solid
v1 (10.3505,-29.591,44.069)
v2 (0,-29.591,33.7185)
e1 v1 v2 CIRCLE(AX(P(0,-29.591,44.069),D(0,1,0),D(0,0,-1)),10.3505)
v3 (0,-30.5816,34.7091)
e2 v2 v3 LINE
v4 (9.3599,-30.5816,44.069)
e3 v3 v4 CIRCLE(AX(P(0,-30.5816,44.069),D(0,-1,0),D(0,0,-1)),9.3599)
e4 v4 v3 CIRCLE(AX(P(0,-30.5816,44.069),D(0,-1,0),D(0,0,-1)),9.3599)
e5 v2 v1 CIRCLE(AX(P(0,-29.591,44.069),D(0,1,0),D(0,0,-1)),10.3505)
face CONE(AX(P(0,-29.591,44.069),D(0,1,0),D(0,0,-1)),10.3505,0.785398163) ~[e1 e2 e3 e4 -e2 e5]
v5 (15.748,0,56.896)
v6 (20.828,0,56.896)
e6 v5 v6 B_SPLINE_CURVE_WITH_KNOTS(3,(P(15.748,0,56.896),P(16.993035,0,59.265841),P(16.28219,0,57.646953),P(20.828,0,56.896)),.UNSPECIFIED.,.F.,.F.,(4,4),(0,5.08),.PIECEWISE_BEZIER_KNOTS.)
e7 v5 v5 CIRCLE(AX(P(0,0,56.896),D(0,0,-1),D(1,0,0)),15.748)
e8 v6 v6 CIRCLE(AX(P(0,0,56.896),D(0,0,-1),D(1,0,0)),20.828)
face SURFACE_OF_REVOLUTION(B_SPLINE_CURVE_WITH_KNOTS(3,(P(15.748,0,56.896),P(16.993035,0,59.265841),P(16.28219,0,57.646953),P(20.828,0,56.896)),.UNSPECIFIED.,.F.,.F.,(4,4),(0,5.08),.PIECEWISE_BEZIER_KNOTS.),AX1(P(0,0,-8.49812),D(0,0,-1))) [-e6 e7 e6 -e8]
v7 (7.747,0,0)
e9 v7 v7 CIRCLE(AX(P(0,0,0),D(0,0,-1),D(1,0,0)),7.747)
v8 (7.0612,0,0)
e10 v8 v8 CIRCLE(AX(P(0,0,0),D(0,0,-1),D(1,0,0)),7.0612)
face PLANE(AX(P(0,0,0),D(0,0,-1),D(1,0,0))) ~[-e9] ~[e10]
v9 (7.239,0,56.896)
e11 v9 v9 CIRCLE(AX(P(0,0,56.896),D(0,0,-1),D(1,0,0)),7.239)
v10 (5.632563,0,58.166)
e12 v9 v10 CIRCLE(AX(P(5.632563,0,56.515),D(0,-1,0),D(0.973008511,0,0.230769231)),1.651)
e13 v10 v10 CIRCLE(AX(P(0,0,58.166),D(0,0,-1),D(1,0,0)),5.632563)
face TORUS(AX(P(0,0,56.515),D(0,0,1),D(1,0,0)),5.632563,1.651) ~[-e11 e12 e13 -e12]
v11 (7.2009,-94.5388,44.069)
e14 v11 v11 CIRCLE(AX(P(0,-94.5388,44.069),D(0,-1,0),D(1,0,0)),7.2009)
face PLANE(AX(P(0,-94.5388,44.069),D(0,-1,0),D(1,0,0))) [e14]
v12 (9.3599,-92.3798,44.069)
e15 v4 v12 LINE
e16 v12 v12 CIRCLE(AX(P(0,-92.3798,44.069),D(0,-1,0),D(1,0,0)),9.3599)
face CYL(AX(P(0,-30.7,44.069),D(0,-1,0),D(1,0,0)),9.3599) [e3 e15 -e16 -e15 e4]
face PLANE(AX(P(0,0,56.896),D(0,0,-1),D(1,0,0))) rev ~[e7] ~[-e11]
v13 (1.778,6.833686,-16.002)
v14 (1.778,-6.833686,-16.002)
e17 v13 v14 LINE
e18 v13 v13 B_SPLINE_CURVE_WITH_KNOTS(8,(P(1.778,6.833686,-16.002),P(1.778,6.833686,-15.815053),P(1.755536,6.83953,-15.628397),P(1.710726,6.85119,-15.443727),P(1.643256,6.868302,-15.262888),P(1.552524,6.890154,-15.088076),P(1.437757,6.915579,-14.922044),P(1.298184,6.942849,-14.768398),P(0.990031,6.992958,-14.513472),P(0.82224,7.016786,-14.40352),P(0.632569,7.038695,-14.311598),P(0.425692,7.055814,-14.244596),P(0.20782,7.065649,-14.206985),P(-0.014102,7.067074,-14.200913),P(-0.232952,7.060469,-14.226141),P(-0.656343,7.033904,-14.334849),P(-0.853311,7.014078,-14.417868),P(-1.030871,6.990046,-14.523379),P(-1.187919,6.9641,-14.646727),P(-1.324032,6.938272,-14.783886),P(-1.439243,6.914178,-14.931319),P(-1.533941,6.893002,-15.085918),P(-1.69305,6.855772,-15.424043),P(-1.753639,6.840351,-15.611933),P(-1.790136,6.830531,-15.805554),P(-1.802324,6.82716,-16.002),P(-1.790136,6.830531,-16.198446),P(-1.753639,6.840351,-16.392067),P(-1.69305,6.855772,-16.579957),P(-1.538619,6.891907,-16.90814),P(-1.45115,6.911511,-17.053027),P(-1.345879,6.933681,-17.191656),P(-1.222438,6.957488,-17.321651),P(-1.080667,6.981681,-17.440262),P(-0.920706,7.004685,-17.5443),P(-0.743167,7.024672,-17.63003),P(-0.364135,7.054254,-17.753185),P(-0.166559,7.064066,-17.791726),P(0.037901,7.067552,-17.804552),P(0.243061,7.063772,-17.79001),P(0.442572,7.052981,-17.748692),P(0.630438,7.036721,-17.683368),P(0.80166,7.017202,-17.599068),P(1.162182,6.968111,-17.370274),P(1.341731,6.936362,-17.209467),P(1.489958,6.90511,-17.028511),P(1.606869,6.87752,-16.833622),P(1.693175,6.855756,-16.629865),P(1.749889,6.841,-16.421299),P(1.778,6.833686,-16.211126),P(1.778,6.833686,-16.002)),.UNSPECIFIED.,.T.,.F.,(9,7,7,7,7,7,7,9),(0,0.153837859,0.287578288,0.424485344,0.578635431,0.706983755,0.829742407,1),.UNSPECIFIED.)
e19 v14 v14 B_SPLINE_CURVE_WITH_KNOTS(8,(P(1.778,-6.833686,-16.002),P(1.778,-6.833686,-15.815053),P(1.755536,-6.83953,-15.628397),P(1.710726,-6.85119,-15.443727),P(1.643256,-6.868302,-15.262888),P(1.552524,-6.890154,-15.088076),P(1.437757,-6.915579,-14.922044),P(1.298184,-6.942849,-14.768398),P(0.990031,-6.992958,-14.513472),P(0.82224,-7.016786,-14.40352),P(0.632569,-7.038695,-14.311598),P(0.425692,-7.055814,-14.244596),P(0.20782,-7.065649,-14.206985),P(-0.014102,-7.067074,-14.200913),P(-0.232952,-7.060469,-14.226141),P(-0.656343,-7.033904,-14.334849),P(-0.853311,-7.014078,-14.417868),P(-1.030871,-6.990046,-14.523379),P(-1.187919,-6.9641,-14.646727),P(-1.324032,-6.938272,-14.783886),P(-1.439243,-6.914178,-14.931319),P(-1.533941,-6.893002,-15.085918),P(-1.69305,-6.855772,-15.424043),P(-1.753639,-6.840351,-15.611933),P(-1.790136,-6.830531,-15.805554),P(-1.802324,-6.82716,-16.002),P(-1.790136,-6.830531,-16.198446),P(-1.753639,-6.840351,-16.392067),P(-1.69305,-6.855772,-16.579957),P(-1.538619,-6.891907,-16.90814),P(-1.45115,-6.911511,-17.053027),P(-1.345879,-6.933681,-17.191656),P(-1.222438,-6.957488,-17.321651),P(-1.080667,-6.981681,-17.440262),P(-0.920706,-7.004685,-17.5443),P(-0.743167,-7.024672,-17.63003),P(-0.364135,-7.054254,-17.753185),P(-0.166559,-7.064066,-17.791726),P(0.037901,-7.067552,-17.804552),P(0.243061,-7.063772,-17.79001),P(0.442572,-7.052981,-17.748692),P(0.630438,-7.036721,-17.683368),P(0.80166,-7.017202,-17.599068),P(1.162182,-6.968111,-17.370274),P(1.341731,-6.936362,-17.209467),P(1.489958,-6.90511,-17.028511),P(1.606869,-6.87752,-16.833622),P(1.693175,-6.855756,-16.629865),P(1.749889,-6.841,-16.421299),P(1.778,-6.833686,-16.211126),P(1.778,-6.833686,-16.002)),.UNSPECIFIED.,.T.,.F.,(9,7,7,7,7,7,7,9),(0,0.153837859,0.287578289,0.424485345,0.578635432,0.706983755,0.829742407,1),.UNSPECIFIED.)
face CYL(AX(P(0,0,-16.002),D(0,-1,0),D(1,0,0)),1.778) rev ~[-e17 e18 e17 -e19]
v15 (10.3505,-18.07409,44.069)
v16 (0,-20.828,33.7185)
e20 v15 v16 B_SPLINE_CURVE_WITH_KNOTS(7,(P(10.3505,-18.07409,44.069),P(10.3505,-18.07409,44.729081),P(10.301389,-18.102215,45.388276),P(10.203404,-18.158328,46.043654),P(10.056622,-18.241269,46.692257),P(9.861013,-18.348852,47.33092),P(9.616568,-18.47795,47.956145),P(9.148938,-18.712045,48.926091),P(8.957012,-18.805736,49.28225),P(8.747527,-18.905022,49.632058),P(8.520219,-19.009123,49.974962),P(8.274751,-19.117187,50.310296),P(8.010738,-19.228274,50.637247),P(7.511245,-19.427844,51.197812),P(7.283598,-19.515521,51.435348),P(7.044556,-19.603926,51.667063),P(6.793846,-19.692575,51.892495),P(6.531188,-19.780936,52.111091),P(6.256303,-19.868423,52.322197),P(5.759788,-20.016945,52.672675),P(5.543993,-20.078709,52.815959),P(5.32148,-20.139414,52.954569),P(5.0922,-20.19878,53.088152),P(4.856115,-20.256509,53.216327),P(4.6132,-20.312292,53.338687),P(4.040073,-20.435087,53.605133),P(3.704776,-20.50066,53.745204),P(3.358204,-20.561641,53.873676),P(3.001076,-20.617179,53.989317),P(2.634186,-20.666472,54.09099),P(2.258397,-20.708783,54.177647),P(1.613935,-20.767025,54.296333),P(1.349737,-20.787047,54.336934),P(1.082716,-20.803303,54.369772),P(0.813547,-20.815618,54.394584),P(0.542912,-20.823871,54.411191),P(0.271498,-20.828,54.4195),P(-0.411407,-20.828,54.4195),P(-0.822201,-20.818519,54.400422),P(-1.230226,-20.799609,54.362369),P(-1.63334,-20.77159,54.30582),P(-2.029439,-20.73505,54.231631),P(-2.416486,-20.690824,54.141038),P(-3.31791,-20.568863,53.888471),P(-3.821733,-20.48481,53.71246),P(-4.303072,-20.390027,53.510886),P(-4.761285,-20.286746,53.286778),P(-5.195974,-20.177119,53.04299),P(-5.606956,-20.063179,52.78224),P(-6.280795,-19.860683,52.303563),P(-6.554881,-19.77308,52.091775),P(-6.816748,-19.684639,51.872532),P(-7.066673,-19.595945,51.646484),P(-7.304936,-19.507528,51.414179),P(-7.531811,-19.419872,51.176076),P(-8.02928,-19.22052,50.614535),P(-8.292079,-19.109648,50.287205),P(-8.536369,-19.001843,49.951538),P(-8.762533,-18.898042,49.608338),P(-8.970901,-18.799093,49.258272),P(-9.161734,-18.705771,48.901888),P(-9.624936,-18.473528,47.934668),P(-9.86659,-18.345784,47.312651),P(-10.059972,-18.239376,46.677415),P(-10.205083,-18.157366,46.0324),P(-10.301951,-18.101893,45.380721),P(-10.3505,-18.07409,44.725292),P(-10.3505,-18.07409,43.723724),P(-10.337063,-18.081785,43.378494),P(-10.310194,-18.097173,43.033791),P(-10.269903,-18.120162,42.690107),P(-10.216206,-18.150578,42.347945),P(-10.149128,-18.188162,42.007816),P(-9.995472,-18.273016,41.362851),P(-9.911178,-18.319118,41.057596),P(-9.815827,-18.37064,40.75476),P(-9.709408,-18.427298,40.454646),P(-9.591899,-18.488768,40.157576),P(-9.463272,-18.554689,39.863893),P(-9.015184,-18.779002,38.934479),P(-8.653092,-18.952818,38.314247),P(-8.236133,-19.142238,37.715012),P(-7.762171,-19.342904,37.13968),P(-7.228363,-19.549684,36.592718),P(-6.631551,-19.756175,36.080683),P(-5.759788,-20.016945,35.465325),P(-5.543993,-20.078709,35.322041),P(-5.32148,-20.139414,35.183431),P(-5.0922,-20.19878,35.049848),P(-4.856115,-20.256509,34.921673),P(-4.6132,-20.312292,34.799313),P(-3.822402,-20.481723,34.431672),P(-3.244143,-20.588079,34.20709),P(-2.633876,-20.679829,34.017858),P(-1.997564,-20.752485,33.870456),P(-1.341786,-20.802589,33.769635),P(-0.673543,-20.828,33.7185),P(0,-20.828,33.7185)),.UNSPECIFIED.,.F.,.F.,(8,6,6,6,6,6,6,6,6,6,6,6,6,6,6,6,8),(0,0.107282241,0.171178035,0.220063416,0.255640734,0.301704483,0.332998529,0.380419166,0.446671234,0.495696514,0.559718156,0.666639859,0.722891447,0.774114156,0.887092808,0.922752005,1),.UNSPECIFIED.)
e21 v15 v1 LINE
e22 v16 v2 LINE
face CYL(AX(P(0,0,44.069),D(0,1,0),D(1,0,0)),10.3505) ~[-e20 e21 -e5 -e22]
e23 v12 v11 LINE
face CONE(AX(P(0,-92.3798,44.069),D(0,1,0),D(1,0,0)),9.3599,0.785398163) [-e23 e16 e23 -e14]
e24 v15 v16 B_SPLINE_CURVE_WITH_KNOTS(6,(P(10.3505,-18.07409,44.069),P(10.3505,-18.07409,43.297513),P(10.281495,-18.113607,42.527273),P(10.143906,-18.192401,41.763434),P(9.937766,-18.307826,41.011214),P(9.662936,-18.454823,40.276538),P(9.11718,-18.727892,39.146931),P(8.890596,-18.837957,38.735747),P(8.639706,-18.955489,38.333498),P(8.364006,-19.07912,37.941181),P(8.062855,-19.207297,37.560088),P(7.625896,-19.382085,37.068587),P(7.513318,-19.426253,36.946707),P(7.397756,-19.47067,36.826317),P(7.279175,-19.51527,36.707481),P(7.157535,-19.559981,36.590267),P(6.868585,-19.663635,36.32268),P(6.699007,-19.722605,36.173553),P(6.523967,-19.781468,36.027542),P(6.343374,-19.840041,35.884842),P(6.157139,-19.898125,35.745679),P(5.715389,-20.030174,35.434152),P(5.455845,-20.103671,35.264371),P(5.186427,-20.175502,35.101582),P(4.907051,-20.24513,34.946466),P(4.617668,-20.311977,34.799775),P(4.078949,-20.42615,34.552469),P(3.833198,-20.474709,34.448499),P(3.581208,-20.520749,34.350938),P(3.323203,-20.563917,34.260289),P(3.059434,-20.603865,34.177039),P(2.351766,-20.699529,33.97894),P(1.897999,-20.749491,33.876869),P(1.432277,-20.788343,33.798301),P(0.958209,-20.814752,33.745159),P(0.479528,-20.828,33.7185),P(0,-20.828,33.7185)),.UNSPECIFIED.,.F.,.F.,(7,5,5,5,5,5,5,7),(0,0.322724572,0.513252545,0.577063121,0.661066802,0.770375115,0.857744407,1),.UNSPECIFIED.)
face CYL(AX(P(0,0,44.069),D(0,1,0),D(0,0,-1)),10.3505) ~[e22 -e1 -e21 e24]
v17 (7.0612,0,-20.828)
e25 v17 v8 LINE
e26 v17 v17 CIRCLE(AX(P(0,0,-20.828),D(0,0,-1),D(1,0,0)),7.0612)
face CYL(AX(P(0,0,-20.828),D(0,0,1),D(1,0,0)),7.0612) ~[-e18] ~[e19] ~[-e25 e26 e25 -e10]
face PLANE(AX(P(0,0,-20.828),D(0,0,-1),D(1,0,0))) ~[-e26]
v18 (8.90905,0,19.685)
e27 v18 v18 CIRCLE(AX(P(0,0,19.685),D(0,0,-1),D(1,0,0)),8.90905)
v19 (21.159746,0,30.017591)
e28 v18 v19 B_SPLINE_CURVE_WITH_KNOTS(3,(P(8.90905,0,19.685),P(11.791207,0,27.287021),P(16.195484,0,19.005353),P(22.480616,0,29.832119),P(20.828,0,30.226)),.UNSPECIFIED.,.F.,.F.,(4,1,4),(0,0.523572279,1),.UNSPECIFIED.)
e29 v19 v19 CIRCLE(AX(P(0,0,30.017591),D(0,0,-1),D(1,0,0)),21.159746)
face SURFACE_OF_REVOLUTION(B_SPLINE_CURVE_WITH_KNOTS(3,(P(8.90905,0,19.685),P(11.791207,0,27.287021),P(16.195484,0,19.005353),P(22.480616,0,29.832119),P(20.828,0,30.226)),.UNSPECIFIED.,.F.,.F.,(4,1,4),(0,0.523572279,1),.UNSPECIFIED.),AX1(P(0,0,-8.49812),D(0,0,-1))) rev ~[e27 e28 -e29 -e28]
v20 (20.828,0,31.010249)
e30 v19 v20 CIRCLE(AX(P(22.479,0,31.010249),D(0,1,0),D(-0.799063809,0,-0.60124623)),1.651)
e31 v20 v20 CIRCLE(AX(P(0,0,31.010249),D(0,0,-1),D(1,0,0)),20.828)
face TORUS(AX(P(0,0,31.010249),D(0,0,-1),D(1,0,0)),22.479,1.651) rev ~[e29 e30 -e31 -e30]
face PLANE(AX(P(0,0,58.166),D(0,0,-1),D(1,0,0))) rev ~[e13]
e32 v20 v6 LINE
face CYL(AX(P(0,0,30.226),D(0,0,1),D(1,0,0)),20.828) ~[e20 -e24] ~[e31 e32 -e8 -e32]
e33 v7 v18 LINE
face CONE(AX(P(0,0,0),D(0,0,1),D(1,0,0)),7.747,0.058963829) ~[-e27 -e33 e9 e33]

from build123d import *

# Parameters (mm, degrees)
F2_R        = 1.778
F3_DEPTH    = 12.7
F5_DEPTH    = 31.75
F6_R        = 9.3599
F7_DEPTH    = 62.7888
F8_S5_R     = 9.3599
F8_T6_DEPTH = 16


# Not quite as in the source:
# - a fillet or chamfer that OpenCascade refuses, or shapes differently, is made with other operations: its cross-section is extruded or revolved along the edge and cut away or added


with BuildPart() as f1:
    # F0 (on Front) → F1 (revolve)
    with BuildSketch(Plane.XZ):
        with BuildLine():
            Line((6.35, 58.166), (0, 58.166))
            Line((0, 58.166), (0, 30.226))
            Line((0, 30.226), (0, 19.685))
            Line((0, 19.685), (0, 0))
            Line((0, 0), (0, -20.828))
            Line((0, -20.828), (7.0612, -20.828))
            Line((7.0612, -20.828), (7.0612, 0))
            Line((7.0612, 0), (7.747, 0))
            Line((7.747, 0), (8.90905, 19.685))
            add(Edge.make_bspline(
                [(8.90905, 19.685), (11.7912068963, 27.2870212793), (16.1954839903, 19.0053529362), (22.480616346, 29.8321191221), (20.828, 30.226)],
                knots=[0, 0, 0, 0, 0.5235722787, 1, 1, 1, 1], degree=3))
            Line((20.828, 30.226), (20.828, 56.896))
            add(Edge.make_bspline(
                [(15.748, 56.896), (16.993034631, 59.2658407986), (16.2821896374, 57.6469525695), (20.828, 56.896)],
                knots=[0, 0, 0, 0, 5.08, 5.08, 5.08, 5.08], degree=3))
            Line((15.748, 56.896), (7.239, 56.896))
            Line((7.239, 56.896), (7.239, 58.166))
            Line((7.239, 58.166), (6.35, 58.166))
        make_face()
    revolve(axis=Axis((0, 0, -8.4981196864), (0, 0, -1)))

    # F2 (on Front) → F3 (cut, symmetric)
    with BuildSketch(Plane.XZ):
        with Locations((0, -16.002)):
            Circle(F2_R)
    extrude(amount=F3_DEPTH, both=True, mode=Mode.SUBTRACT)

    # F4 (on Front) → F5 (join)
    with BuildSketch(Plane.XZ):
        with BuildLine():
            ThreePointArc((0, 33.7185), (7.3189087387, 36.7500912613), (10.3505, 44.069))
            ThreePointArc((10.3505, 44.069), (-7.3189087387, 51.3879087387), (0, 33.7185))
        make_face()
    extrude(amount=F5_DEPTH)

    # F6 (on face) → F7 (join)
    with BuildSketch(Plane.XZ.offset(31.75)):
        with Locations((0, 44.069)):
            Circle(F6_R)
    extrude(amount=F7_DEPTH)

    # F8: chamfer of 2.159 on 2 edges, made by hand


with BuildPart() as f8_tool2:
    # F8_s3 → F8_t4 (revolve)
    with BuildSketch(Plane.YZ):
        Polygon((-29.591, 33.7185), (-31.75, 35.8775), (-31.75, 33.7185), align=None)
    revolve(axis=Axis((0, -31.75, 44.069), (0, 1, 0)))

    # F8_s5 → F8_t6 (cut, symmetric)
    with BuildSketch(Plane.XZ.offset(30.7)):
        with Locations((0, 44.069)):
            Circle(F8_S5_R)
    extrude(amount=F8_T6_DEPTH, both=True, mode=Mode.SUBTRACT)


with BuildPart() as f1_1:
    add(f1.part)

    # F8_t1: cut F8_tool2
    add(f8_tool2.part, mode=Mode.SUBTRACT)

    # F8_s7 → F8_t8 (revolve, cut)
    with BuildSketch(Plane.XY.offset(44.069)):
        Polygon((9.3599, -92.3798), (7.2009, -94.5388), (9.3599, -94.5388), align=None)
    revolve(axis=Axis((0, -94.5388, 44.069), (0, -1, 0)), mode=Mode.SUBTRACT)

    # F9: fillet of radius 1.651 on 2 edges, made by hand

    # F9_s1 → F9_t2 (revolve, cut)
    with BuildSketch(Plane.XZ):
        with BuildLine():
            ThreePointArc((7.239, 56.896), (6.6564696827, 57.8101509565), (5.6325629486, 58.166))
            Line((5.6325629486, 58.166), (5.6325629486, 58.19902))
            Line((5.6325629486, 58.19902), (7.239, 58.19902))
            Line((7.239, 58.19902), (7.27202, 58.166))
            ThreePointArc((7.27202, 58.166), (7.27202, 57.531), (7.271128741, 56.90362))
            Line((7.271128741, 56.90362), (7.239, 56.896))
        make_face()
    revolve(axis=Axis((0, 0, 58.166), (0, 0, -1)), mode=Mode.SUBTRACT)

    # F9_s3 → F9_t4 (revolve)
    with BuildSketch(Plane.XZ):
        with BuildLine():
            ThreePointArc((21.1597456512, 30.0175911775), (20.9131312427, 30.4869361434), (20.828, 31.010248703))
            Line((20.828, 31.010248703), (20.79498, 31.010248703))
            Line((20.79498, 31.010248703), (20.79498, 30.226))
            Line((20.79498, 30.226), (20.8203445184, 30.1938796949))
            ThreePointArc((20.8203445184, 30.1938796949), (20.9949538129, 30.1235602191), (21.1333605642, 29.997738027))
            Line((21.1333605642, 29.997738027), (21.1597456512, 30.0175911775))
        make_face()
    revolve(axis=Axis((0, 0, 30.226), (0, 0, -1)))


solid = f1_1.part
